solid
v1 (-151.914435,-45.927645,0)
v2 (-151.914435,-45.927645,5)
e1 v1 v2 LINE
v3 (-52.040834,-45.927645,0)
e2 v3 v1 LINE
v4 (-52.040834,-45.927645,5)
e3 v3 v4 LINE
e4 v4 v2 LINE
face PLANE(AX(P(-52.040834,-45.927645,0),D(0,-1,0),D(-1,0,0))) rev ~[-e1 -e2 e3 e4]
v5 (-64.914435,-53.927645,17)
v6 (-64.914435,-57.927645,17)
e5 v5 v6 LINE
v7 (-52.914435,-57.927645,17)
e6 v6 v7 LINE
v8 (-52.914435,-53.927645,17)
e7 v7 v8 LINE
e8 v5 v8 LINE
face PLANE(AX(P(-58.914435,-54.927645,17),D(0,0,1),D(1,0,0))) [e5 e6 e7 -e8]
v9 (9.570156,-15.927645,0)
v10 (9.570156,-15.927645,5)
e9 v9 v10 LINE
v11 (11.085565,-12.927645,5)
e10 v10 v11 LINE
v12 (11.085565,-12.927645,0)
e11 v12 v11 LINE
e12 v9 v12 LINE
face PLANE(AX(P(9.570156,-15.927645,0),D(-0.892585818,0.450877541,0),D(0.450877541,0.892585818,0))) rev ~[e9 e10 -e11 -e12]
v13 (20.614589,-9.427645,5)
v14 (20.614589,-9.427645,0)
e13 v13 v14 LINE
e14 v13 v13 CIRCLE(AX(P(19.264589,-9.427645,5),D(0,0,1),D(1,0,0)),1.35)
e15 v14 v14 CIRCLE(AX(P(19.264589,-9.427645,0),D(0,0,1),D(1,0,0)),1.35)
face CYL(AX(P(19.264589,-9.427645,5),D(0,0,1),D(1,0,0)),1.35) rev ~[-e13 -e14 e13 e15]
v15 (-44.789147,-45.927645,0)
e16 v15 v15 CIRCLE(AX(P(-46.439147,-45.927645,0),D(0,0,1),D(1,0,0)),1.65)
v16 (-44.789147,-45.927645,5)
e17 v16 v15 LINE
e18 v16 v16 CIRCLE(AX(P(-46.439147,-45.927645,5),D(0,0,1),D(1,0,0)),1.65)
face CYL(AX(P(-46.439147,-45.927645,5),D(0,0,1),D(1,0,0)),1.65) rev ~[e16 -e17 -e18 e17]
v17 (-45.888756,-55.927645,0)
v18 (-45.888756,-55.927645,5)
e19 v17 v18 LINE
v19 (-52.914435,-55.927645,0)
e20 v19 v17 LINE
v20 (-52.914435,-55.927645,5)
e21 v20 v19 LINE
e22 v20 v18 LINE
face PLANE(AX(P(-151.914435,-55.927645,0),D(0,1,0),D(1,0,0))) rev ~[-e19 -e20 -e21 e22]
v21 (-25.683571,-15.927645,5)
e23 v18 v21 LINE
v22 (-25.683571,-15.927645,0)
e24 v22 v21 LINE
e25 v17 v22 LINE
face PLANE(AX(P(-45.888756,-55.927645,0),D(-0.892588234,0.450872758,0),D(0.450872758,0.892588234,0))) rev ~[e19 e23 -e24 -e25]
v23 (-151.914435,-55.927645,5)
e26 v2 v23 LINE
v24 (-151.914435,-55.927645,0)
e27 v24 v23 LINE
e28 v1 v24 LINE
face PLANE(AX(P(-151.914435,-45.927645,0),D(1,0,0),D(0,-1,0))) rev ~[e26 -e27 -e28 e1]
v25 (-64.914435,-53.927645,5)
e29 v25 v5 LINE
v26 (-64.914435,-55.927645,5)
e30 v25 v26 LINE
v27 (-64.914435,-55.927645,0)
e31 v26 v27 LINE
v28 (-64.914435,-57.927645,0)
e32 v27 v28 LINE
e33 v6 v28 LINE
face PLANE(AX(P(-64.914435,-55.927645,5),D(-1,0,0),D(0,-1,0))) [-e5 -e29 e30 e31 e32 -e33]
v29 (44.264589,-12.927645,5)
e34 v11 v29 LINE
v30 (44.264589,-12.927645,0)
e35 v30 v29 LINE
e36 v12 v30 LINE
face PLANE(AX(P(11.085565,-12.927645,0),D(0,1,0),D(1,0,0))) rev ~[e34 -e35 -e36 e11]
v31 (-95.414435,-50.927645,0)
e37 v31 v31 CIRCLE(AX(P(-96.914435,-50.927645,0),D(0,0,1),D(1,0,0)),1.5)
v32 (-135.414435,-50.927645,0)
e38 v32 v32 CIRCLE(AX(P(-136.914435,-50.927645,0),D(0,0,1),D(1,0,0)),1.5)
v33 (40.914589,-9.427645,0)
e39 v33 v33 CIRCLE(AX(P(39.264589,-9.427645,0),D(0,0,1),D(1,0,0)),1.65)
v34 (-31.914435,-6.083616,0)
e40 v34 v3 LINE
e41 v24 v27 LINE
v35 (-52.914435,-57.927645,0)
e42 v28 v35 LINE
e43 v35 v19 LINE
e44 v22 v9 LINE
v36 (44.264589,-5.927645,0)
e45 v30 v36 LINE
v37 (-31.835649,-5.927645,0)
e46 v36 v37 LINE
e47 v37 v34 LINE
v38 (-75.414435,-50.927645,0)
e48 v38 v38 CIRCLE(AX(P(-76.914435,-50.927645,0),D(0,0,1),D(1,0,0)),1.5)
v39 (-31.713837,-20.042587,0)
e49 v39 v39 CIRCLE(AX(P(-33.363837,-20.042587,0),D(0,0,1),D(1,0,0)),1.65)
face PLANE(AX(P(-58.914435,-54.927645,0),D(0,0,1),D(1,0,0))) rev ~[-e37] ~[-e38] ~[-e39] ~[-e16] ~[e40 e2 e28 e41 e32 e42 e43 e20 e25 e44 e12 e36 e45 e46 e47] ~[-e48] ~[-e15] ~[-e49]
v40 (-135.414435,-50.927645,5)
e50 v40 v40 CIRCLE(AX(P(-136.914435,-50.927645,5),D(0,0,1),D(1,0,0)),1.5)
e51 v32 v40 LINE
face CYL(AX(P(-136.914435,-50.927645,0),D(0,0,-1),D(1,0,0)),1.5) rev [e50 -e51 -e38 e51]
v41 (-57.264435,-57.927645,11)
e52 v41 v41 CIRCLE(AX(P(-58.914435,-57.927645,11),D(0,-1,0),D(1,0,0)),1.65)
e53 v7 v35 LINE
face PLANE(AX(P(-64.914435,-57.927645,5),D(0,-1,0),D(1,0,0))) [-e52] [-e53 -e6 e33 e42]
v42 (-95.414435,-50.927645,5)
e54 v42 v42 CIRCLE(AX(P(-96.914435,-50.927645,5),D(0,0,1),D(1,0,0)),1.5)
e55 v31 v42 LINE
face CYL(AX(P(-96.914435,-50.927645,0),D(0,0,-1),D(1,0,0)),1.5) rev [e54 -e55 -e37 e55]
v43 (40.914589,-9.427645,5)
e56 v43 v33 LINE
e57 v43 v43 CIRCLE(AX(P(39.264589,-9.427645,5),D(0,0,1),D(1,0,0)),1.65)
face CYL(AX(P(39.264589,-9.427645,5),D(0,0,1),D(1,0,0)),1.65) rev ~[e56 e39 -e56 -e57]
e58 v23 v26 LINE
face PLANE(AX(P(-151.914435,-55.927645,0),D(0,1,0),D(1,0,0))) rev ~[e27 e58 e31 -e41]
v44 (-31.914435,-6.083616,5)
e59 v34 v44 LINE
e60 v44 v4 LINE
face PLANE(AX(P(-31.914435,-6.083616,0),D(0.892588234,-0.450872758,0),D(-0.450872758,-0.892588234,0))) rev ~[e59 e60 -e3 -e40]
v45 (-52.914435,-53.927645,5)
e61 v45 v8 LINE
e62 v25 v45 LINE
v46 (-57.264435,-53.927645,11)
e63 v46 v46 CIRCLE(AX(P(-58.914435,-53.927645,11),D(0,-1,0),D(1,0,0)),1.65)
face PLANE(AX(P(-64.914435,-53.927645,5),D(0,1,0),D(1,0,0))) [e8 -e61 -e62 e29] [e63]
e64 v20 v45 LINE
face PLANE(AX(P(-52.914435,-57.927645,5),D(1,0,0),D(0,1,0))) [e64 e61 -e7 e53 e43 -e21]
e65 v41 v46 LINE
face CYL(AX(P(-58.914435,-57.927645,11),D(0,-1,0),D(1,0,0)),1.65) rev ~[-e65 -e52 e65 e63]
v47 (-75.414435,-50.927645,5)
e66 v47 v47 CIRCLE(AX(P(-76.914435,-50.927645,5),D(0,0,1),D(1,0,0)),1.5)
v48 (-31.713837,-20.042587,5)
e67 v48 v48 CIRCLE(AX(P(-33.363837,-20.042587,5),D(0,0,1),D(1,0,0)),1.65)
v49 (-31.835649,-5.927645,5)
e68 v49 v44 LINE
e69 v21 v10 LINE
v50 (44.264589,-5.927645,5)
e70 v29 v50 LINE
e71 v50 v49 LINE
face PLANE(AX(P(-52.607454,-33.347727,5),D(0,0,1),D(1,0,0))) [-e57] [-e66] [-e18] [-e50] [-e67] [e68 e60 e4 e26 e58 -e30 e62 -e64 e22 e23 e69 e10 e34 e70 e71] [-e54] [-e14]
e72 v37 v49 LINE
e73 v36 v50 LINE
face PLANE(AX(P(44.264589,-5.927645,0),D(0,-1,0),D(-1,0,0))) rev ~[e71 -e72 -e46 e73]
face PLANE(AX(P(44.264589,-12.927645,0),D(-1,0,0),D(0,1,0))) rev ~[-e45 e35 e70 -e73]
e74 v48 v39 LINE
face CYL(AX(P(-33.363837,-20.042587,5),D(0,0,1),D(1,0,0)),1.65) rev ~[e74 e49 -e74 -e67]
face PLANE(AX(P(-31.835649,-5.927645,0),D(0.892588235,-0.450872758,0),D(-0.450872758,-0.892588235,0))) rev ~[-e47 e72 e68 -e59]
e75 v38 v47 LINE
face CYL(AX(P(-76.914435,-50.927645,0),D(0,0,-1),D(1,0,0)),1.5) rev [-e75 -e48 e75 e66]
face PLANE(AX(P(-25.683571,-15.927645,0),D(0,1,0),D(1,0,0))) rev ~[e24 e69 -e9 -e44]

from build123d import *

# Parameters (mm, degrees)
F0_R     = 1.5
F1_DEPTH = 5
F2_DEPTH = 268
F3_R     = 1.65
F3_R_2   = 1.35
F4_DEPTH = 5.001
F5_W     = 12
F5_H     = 2
F6_DEPTH = 12
F7_DEPTH = 5
F8_R     = 1.65
F9_DEPTH = 52.0010001044


# Not quite as in the source:
# - an extrude ends at something that could not be found from the text; its depth is read off the source's solid


with BuildPart() as f1:
    # F0 (on Top) → F1 (new body)
    with BuildSketch(Plane.XY):
        Polygon((-52.0408339798, -45.9276453106), (-151.9144345724, -45.9276453106), (-151.9144345724, -55.9276454151), (-45.8887560524, -55.9276454151), (-25.683571109, -15.9276453106), (9.5701563833, -15.9276453106), (11.0855654276, -12.9276453106), (44.264588505, -12.9276453106), (44.264588505, -5.9276453106), (27.9570557177, -5.9276453106), (-31.8356490892, -5.9276453106), (-31.9144345724, -6.0836161342), align=None)
        with Locations((-136.9144345724, -50.9276454151)):
            Circle(F0_R, mode=Mode.SUBTRACT)
        with Locations((-96.9144345724, -50.9276454151)):
            Circle(F0_R, mode=Mode.SUBTRACT)
        with Locations((-76.9144345724, -50.9276454151)):
            Circle(F0_R, mode=Mode.SUBTRACT)
    extrude(amount=F1_DEPTH)

    # F0 (on Top) → F2 (cut, through all)
    with BuildSketch(Plane.XY):
        with Locations((-76.9144345724, -50.9276454151)):
            Circle(F0_R)
        with Locations((-96.9144345724, -50.9276454151)):
            Circle(F0_R)
    extrude(amount=-F2_DEPTH, mode=Mode.SUBTRACT)

    # F3 (on face) → F4 (cut, through all)
    with BuildSketch(Plane.XY.offset(5)):
        with Locations((39.264588505, -9.4276453106)):
            Circle(F3_R)
        with Locations((19.264588505, -9.4276453106)):
            Circle(F3_R_2)
        with Locations((-33.3638369572, -20.042586615)):
            Circle(F3_R)
        with Locations((-46.4391469312, -45.9276454151)):
            Circle(F3_R)
    extrude(amount=-F4_DEPTH, mode=Mode.SUBTRACT)

    # F5 (on face) → F6 (join)
    with BuildSketch(Plane.XY.offset(5)):
        with Locations((-58.9144345724, -54.9276454151)):
            Rectangle(F5_W, F5_H)
        with Locations((-58.9144345724, -56.9276454151)):
            Rectangle(F5_W, F5_H)
    extrude(amount=F6_DEPTH)

    # F7 (add): a face of the model
    f7_faces = [f1.faces().sort_by_distance(p)[0] for p in [
        (-58.9144345724, -56.9276454151, 5),
    ]]
    extrude(f7_faces, amount=F7_DEPTH)

    # F8 (on face) → F9 (cut, through all)
    with BuildSketch(Plane.XZ.offset(57.9276454151)):
        with Locations((-58.9144345724, 11)):
            Circle(F8_R)
    extrude(amount=-F9_DEPTH, mode=Mode.SUBTRACT)


solid = f1.part
